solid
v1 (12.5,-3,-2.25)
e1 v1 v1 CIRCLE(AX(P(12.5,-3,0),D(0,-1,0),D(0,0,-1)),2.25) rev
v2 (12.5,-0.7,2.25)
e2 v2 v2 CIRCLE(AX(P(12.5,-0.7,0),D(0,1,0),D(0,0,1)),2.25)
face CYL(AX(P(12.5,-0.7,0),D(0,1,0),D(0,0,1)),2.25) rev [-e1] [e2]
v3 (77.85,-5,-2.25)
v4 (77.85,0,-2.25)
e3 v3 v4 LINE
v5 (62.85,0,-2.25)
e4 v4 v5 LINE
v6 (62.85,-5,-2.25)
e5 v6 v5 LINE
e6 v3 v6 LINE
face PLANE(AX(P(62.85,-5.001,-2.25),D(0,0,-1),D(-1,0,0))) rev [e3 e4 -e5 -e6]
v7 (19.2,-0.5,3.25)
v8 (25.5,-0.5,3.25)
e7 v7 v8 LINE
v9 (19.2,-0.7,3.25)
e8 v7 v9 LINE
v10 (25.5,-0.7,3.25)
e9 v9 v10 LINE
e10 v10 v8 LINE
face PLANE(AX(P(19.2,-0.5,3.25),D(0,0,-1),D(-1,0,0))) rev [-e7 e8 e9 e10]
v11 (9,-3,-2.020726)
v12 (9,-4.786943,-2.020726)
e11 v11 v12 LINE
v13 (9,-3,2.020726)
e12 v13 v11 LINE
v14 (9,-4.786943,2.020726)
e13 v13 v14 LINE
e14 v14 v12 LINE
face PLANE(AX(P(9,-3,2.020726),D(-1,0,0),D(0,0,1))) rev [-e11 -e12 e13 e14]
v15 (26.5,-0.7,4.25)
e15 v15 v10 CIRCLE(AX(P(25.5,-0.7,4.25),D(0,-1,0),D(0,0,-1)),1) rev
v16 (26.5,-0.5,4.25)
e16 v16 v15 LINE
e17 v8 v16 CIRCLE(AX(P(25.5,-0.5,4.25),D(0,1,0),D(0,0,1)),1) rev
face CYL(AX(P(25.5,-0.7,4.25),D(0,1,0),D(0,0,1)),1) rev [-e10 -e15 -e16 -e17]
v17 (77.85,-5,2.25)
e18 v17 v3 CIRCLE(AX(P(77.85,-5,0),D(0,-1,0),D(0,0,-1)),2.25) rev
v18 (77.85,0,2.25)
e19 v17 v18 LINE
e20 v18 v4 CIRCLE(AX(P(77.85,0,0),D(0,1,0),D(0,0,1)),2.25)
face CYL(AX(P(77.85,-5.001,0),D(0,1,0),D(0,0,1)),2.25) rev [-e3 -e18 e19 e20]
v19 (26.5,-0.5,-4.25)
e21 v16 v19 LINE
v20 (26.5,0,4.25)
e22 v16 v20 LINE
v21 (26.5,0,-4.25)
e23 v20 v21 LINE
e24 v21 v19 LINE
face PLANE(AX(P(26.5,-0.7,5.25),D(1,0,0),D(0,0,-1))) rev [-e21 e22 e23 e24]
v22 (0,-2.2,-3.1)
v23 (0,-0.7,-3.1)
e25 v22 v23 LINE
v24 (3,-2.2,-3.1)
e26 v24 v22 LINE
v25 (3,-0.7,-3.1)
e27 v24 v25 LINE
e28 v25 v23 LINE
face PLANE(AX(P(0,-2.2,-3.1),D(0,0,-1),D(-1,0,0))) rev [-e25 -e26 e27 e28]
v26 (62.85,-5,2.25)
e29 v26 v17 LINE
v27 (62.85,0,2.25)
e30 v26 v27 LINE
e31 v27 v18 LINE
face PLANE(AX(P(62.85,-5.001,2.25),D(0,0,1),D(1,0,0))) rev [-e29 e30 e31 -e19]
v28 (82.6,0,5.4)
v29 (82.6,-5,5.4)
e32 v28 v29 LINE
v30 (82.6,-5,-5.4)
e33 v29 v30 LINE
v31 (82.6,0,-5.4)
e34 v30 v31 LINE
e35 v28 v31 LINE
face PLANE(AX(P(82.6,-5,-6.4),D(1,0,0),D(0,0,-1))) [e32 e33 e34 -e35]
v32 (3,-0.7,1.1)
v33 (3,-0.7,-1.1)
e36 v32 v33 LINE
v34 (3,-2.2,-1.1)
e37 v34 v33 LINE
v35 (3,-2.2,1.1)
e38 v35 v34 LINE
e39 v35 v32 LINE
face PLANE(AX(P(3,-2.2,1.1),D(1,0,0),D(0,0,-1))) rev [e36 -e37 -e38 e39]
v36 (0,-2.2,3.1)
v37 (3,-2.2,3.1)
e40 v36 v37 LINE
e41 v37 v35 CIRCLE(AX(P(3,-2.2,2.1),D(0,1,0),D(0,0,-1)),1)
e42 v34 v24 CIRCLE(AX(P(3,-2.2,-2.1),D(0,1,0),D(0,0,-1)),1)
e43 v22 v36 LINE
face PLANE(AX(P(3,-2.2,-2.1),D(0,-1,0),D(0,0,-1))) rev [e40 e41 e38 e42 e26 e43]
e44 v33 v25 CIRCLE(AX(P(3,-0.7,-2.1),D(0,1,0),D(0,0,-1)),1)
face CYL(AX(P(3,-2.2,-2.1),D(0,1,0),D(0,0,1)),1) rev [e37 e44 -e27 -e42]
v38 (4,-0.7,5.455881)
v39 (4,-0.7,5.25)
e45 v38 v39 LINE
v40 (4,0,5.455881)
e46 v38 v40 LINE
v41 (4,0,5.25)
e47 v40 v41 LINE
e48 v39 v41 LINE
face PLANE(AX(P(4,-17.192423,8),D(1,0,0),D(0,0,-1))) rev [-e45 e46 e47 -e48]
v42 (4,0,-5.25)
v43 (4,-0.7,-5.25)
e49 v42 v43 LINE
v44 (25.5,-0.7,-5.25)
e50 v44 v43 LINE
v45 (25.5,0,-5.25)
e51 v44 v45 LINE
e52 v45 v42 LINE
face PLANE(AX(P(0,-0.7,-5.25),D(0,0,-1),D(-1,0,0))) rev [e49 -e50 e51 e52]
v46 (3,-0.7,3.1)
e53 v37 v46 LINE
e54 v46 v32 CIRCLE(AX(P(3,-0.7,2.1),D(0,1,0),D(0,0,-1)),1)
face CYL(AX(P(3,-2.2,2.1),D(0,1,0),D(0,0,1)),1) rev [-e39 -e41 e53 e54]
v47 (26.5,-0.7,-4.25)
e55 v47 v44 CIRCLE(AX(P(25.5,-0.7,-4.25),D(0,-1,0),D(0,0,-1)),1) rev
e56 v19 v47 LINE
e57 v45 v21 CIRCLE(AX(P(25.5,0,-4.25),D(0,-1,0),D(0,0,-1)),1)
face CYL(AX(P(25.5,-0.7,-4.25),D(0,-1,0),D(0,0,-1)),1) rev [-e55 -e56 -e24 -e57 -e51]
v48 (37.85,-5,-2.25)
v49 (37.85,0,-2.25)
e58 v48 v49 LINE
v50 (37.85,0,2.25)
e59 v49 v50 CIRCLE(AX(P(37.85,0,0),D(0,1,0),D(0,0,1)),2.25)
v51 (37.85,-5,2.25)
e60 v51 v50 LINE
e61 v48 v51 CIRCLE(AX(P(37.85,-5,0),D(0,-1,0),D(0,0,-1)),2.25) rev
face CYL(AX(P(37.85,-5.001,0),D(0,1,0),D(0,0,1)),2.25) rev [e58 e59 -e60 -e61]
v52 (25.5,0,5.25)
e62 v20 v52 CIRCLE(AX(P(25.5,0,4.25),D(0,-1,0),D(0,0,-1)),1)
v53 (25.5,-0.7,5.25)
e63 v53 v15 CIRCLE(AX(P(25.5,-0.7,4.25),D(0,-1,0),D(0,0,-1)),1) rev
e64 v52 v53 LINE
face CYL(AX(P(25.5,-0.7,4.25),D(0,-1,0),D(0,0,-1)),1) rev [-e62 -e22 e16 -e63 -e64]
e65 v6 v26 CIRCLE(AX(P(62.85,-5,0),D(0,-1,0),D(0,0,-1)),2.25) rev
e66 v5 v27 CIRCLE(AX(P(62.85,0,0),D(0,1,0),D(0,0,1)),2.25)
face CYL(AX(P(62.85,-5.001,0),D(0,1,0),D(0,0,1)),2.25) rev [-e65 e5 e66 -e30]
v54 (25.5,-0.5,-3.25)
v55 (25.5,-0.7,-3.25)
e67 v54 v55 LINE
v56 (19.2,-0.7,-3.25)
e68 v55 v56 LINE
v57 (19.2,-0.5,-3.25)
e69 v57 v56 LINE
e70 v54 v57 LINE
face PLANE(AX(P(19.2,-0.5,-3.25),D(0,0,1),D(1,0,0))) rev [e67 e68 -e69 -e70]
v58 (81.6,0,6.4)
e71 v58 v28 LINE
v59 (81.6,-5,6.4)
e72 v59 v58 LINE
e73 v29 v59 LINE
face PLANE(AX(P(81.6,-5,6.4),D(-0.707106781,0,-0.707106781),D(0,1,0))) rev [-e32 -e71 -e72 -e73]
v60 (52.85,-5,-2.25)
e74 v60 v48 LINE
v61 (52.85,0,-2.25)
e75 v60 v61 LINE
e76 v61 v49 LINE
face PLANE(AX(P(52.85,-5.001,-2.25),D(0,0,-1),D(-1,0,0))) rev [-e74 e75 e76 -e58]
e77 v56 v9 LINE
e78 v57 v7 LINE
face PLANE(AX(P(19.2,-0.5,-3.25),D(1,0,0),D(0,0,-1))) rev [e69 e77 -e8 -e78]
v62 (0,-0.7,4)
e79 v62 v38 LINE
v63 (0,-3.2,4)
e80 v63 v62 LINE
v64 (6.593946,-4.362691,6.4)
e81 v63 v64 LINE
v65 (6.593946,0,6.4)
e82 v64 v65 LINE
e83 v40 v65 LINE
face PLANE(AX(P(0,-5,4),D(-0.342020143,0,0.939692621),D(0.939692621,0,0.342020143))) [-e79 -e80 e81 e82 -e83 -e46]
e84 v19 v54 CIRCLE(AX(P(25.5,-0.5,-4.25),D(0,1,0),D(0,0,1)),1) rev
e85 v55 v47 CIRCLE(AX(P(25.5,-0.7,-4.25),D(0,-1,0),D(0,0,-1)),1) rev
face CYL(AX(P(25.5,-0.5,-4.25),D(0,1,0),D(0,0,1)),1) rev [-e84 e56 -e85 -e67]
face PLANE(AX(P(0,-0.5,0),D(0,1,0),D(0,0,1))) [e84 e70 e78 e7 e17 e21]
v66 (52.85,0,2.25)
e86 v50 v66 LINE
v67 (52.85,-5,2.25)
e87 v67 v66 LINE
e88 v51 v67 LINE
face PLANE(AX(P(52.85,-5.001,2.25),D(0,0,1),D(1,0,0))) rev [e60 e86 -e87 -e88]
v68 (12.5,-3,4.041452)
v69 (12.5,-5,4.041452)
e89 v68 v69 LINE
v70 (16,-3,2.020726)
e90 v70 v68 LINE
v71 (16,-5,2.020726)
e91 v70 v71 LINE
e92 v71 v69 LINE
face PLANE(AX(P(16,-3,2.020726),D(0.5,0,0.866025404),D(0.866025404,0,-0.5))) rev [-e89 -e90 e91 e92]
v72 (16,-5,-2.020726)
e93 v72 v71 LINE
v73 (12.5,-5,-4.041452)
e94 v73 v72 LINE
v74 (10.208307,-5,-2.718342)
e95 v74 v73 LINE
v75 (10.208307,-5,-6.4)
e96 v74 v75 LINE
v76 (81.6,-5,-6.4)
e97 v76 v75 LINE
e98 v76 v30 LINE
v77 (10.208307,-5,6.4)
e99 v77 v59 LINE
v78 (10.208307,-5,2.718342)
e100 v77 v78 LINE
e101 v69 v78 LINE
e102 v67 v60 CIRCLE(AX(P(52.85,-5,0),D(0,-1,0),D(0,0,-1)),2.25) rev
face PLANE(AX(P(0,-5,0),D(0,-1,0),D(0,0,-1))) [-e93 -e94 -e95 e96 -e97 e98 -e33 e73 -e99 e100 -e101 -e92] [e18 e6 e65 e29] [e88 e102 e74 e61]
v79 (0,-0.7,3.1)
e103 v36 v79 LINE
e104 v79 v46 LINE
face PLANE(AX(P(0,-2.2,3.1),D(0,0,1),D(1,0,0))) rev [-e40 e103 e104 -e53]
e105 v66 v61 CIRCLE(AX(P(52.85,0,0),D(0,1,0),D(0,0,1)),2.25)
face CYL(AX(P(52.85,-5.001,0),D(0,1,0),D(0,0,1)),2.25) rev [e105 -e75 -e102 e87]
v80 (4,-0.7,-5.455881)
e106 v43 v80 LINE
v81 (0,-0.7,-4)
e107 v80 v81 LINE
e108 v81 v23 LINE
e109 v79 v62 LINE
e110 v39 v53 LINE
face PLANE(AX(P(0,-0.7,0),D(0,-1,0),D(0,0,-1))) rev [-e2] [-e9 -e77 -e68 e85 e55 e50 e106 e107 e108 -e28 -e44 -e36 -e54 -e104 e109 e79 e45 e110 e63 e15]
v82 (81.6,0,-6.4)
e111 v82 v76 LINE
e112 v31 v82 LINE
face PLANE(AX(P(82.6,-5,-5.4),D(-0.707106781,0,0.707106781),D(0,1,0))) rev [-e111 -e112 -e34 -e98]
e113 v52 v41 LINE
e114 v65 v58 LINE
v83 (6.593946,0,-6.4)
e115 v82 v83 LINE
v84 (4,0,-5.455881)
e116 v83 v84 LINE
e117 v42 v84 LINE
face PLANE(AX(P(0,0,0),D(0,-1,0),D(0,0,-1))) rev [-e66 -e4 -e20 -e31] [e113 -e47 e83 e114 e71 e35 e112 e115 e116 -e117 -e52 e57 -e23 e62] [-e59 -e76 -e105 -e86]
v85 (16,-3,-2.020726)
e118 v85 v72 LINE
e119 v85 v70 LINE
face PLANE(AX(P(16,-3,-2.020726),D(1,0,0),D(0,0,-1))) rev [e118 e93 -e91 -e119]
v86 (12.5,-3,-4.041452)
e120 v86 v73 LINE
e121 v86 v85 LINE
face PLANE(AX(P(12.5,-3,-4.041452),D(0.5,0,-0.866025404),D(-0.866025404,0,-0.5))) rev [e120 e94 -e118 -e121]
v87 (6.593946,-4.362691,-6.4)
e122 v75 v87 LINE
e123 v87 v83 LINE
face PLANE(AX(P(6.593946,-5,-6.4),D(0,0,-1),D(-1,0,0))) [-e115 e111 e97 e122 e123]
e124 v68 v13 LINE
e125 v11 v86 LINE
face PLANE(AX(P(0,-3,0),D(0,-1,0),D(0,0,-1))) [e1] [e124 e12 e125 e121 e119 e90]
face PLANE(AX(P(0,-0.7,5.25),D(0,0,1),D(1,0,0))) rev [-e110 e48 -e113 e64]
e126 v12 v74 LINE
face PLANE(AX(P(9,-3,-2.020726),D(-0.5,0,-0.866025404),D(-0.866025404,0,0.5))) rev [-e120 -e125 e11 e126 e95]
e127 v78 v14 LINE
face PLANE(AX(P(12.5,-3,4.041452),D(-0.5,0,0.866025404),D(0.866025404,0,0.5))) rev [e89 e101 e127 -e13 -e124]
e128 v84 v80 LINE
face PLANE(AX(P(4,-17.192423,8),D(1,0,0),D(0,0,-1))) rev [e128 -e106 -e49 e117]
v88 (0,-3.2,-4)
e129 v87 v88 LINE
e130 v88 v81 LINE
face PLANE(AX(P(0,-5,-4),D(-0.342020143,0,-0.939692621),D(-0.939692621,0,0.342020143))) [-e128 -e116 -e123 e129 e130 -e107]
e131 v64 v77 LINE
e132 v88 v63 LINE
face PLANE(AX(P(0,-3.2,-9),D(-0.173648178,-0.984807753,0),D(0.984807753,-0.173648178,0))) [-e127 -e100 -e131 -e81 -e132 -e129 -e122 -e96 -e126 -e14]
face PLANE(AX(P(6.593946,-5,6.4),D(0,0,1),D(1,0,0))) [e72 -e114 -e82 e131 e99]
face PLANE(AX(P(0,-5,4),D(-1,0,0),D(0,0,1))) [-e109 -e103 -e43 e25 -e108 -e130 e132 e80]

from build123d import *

# Parameters (mm, degrees)
BOSS_EXTRUDE1_DEPTH   = 5
CUT_EXTRUDE1_REACH    = 84.998
CUT_EXTRUDE2_DEPTH    = 9
SKETCH7_W             = 26.5
SKETCH7_H             = 10.5
CUT_EXTRUDE3_DEPTH    = 0.7
CUT_EXTRUDE4_DEPTH    = 1.5
F_4_0MM_DOWEL_HOLE1_D = 4.5
CUT_EXTRUDE6_DEPTH    = 2
CHAMFER1_SIZE         = 1
SKETCH12_W            = 4
SKETCH12_H            = 16
CUT_EXTRUDE5_DEPTH    = 0.7
SKETCH13_W            = 7.3
SKETCH13_H            = 6.5
BOSS_EXTRUDE2_DEPTH   = 0.2
FILLET1_R             = 1


with BuildPart() as part:
    # Sketch1 → Boss-Extrude1 (new body)
    with BuildSketch(Plane(origin=(0, 0, 0), x_dir=(1, 0, 0), z_dir=(0, 1, 0))):
        Polygon((0, -4), (0, 4), (6.593945807, 6.4), (82.6, 6.4), (82.6, -6.4), (6.593945807, -6.4), align=None)
    extrude(amount=-BOSS_EXTRUDE1_DEPTH)

    # Sketch2 → Cut-Extrude1 (cut, up to next)
    with BuildSketch(Plane(origin=(0, 0, 0), x_dir=(1, 0, 0), z_dir=(0, 1, 0)), mode=Mode.PRIVATE) as cut_extrude1_sk1:
        with BuildLine():
            Line((62.85, 2.25), (77.85, 2.25))
            ThreePointArc((77.85, 2.25), (80.1, 0), (77.85, -2.25))
            Line((77.85, -2.25), (62.85, -2.25))
            ThreePointArc((62.85, -2.25), (60.6, 0), (62.85, 2.25))
        make_face()
    cut_extrude1_tool1 = extrude(cut_extrude1_sk1.sketch, amount=-CUT_EXTRUDE1_REACH, mode=Mode.PRIVATE) & part.part
    # Sketch2 → Cut-Extrude1 (cut, up to next)
    with BuildSketch(Plane(origin=(0, 0, 0), x_dir=(1, 0, 0), z_dir=(0, 1, 0)), mode=Mode.PRIVATE) as cut_extrude1_sk2:
        with BuildLine():
            Line((52.85, -2.25), (37.85, -2.25))
            ThreePointArc((37.85, -2.25), (35.6, 0), (37.85, 2.25))
            Line((37.85, 2.25), (52.85, 2.25))
            ThreePointArc((52.85, 2.25), (55.1, 0), (52.85, -2.25))
        make_face()
    cut_extrude1_tool2 = extrude(cut_extrude1_sk2.sketch, amount=-CUT_EXTRUDE1_REACH, mode=Mode.PRIVATE) & part.part
    add(cut_extrude1_tool1.solids().sort_by_distance((70.35, 0, 0))[0], mode=Mode.SUBTRACT)
    add(cut_extrude1_tool2.solids().sort_by_distance((45.35, 0, 0))[0], mode=Mode.SUBTRACT)

    # Sketch6 → Cut-Extrude2 (cut, symmetric)
    with BuildSketch(Plane.XY):
        Polygon((0, -3.2), (10.208307275, -5), (0, -5), align=None)
    extrude(amount=CUT_EXTRUDE2_DEPTH, both=True, mode=Mode.SUBTRACT)

    # Sketch7 → Cut-Extrude3 (cut)
    with BuildSketch(Plane(origin=(0, 0, 0), x_dir=(1, 0, 0), z_dir=(0, 1, 0))):
        with Locations((13.25, 0)):
            Rectangle(SKETCH7_W, SKETCH7_H)
    extrude(amount=-CUT_EXTRUDE3_DEPTH, mode=Mode.SUBTRACT)

    # Sketch8 → Cut-Extrude4 (cut)
    with BuildSketch(Plane(origin=(0, -0.7, 0), x_dir=(1, 0, 0), z_dir=(0, 1, 0))):
        with BuildLine():
            Line((0, -3.1), (0, 3.1))
            Line((0, 3.1), (3, 3.1))
            ThreePointArc((3, 3.1), (4, 2.1), (3, 1.1))
            Line((3, 1.1), (3, 0))
            Line((3, 0), (3, -1.1))
            ThreePointArc((3, -1.1), (4, -2.1), (3, -3.1))
            Line((3, -3.1), (0, -3.1))
        make_face()
    extrude(amount=-CUT_EXTRUDE4_DEPTH, mode=Mode.SUBTRACT)

    # Ø4.0mm Dowel Hole1 (through all)
    with Locations(Plane(origin=(0, -0.7, 0), x_dir=(1, 0, 0), z_dir=(0, 1, 0))):
        with Locations((12.5, 0)):
            Hole(F_4_0MM_DOWEL_HOLE1_D / 2)

    # Sketch14 → Cut-Extrude6 (cut)
    with BuildSketch(Plane.XZ.offset(5)):
        Polygon((16, -2.020725942), (16, 2.020725942), (12.5, 4.041451884), (9, 2.020725942), (9, -2.020725942), (12.5, -4.041451884), align=None)
    extrude(amount=-CUT_EXTRUDE6_DEPTH, mode=Mode.SUBTRACT)

    # Chamfer1
    chamfer1_edges = [part.edges().sort_by_distance(p)[0] for p in [
        (82.6, -2.5, -6.4),
        (82.6, -2.5, 6.4),
    ]]
    chamfer(chamfer1_edges, length=CHAMFER1_SIZE)

    # Sketch12 → Cut-Extrude5 (cut)
    with BuildSketch(Plane(origin=(0, 0, 0), x_dir=(1, 0, 0), z_dir=(0, 1, 0))):
        with Locations((2, 0)):
            Rectangle(SKETCH12_W, SKETCH12_H)
    extrude(amount=-CUT_EXTRUDE5_DEPTH, mode=Mode.SUBTRACT)

    # Sketch13 → Boss-Extrude2 (add)
    with BuildSketch(Plane(origin=(0, -0.7, 0), x_dir=(1, 0, 0), z_dir=(0, 1, 0))):
        with Locations((22.85, 0)):
            Rectangle(SKETCH13_W, SKETCH13_H)
    extrude(amount=BOSS_EXTRUDE2_DEPTH)

    # Fillet1
    fillet1_edges = [part.edges().sort_by_distance(p)[0] for p in [
        (26.5, -0.35, 5.25),
        (26.5, -0.6, 3.25),
        (26.5, -0.6, -3.25),
        (26.5, -0.35, -5.25),
    ]]
    fillet(fillet1_edges, radius=FILLET1_R - 0.0001)  # a hair under: the kernel refuses the full size


solid = part.part
